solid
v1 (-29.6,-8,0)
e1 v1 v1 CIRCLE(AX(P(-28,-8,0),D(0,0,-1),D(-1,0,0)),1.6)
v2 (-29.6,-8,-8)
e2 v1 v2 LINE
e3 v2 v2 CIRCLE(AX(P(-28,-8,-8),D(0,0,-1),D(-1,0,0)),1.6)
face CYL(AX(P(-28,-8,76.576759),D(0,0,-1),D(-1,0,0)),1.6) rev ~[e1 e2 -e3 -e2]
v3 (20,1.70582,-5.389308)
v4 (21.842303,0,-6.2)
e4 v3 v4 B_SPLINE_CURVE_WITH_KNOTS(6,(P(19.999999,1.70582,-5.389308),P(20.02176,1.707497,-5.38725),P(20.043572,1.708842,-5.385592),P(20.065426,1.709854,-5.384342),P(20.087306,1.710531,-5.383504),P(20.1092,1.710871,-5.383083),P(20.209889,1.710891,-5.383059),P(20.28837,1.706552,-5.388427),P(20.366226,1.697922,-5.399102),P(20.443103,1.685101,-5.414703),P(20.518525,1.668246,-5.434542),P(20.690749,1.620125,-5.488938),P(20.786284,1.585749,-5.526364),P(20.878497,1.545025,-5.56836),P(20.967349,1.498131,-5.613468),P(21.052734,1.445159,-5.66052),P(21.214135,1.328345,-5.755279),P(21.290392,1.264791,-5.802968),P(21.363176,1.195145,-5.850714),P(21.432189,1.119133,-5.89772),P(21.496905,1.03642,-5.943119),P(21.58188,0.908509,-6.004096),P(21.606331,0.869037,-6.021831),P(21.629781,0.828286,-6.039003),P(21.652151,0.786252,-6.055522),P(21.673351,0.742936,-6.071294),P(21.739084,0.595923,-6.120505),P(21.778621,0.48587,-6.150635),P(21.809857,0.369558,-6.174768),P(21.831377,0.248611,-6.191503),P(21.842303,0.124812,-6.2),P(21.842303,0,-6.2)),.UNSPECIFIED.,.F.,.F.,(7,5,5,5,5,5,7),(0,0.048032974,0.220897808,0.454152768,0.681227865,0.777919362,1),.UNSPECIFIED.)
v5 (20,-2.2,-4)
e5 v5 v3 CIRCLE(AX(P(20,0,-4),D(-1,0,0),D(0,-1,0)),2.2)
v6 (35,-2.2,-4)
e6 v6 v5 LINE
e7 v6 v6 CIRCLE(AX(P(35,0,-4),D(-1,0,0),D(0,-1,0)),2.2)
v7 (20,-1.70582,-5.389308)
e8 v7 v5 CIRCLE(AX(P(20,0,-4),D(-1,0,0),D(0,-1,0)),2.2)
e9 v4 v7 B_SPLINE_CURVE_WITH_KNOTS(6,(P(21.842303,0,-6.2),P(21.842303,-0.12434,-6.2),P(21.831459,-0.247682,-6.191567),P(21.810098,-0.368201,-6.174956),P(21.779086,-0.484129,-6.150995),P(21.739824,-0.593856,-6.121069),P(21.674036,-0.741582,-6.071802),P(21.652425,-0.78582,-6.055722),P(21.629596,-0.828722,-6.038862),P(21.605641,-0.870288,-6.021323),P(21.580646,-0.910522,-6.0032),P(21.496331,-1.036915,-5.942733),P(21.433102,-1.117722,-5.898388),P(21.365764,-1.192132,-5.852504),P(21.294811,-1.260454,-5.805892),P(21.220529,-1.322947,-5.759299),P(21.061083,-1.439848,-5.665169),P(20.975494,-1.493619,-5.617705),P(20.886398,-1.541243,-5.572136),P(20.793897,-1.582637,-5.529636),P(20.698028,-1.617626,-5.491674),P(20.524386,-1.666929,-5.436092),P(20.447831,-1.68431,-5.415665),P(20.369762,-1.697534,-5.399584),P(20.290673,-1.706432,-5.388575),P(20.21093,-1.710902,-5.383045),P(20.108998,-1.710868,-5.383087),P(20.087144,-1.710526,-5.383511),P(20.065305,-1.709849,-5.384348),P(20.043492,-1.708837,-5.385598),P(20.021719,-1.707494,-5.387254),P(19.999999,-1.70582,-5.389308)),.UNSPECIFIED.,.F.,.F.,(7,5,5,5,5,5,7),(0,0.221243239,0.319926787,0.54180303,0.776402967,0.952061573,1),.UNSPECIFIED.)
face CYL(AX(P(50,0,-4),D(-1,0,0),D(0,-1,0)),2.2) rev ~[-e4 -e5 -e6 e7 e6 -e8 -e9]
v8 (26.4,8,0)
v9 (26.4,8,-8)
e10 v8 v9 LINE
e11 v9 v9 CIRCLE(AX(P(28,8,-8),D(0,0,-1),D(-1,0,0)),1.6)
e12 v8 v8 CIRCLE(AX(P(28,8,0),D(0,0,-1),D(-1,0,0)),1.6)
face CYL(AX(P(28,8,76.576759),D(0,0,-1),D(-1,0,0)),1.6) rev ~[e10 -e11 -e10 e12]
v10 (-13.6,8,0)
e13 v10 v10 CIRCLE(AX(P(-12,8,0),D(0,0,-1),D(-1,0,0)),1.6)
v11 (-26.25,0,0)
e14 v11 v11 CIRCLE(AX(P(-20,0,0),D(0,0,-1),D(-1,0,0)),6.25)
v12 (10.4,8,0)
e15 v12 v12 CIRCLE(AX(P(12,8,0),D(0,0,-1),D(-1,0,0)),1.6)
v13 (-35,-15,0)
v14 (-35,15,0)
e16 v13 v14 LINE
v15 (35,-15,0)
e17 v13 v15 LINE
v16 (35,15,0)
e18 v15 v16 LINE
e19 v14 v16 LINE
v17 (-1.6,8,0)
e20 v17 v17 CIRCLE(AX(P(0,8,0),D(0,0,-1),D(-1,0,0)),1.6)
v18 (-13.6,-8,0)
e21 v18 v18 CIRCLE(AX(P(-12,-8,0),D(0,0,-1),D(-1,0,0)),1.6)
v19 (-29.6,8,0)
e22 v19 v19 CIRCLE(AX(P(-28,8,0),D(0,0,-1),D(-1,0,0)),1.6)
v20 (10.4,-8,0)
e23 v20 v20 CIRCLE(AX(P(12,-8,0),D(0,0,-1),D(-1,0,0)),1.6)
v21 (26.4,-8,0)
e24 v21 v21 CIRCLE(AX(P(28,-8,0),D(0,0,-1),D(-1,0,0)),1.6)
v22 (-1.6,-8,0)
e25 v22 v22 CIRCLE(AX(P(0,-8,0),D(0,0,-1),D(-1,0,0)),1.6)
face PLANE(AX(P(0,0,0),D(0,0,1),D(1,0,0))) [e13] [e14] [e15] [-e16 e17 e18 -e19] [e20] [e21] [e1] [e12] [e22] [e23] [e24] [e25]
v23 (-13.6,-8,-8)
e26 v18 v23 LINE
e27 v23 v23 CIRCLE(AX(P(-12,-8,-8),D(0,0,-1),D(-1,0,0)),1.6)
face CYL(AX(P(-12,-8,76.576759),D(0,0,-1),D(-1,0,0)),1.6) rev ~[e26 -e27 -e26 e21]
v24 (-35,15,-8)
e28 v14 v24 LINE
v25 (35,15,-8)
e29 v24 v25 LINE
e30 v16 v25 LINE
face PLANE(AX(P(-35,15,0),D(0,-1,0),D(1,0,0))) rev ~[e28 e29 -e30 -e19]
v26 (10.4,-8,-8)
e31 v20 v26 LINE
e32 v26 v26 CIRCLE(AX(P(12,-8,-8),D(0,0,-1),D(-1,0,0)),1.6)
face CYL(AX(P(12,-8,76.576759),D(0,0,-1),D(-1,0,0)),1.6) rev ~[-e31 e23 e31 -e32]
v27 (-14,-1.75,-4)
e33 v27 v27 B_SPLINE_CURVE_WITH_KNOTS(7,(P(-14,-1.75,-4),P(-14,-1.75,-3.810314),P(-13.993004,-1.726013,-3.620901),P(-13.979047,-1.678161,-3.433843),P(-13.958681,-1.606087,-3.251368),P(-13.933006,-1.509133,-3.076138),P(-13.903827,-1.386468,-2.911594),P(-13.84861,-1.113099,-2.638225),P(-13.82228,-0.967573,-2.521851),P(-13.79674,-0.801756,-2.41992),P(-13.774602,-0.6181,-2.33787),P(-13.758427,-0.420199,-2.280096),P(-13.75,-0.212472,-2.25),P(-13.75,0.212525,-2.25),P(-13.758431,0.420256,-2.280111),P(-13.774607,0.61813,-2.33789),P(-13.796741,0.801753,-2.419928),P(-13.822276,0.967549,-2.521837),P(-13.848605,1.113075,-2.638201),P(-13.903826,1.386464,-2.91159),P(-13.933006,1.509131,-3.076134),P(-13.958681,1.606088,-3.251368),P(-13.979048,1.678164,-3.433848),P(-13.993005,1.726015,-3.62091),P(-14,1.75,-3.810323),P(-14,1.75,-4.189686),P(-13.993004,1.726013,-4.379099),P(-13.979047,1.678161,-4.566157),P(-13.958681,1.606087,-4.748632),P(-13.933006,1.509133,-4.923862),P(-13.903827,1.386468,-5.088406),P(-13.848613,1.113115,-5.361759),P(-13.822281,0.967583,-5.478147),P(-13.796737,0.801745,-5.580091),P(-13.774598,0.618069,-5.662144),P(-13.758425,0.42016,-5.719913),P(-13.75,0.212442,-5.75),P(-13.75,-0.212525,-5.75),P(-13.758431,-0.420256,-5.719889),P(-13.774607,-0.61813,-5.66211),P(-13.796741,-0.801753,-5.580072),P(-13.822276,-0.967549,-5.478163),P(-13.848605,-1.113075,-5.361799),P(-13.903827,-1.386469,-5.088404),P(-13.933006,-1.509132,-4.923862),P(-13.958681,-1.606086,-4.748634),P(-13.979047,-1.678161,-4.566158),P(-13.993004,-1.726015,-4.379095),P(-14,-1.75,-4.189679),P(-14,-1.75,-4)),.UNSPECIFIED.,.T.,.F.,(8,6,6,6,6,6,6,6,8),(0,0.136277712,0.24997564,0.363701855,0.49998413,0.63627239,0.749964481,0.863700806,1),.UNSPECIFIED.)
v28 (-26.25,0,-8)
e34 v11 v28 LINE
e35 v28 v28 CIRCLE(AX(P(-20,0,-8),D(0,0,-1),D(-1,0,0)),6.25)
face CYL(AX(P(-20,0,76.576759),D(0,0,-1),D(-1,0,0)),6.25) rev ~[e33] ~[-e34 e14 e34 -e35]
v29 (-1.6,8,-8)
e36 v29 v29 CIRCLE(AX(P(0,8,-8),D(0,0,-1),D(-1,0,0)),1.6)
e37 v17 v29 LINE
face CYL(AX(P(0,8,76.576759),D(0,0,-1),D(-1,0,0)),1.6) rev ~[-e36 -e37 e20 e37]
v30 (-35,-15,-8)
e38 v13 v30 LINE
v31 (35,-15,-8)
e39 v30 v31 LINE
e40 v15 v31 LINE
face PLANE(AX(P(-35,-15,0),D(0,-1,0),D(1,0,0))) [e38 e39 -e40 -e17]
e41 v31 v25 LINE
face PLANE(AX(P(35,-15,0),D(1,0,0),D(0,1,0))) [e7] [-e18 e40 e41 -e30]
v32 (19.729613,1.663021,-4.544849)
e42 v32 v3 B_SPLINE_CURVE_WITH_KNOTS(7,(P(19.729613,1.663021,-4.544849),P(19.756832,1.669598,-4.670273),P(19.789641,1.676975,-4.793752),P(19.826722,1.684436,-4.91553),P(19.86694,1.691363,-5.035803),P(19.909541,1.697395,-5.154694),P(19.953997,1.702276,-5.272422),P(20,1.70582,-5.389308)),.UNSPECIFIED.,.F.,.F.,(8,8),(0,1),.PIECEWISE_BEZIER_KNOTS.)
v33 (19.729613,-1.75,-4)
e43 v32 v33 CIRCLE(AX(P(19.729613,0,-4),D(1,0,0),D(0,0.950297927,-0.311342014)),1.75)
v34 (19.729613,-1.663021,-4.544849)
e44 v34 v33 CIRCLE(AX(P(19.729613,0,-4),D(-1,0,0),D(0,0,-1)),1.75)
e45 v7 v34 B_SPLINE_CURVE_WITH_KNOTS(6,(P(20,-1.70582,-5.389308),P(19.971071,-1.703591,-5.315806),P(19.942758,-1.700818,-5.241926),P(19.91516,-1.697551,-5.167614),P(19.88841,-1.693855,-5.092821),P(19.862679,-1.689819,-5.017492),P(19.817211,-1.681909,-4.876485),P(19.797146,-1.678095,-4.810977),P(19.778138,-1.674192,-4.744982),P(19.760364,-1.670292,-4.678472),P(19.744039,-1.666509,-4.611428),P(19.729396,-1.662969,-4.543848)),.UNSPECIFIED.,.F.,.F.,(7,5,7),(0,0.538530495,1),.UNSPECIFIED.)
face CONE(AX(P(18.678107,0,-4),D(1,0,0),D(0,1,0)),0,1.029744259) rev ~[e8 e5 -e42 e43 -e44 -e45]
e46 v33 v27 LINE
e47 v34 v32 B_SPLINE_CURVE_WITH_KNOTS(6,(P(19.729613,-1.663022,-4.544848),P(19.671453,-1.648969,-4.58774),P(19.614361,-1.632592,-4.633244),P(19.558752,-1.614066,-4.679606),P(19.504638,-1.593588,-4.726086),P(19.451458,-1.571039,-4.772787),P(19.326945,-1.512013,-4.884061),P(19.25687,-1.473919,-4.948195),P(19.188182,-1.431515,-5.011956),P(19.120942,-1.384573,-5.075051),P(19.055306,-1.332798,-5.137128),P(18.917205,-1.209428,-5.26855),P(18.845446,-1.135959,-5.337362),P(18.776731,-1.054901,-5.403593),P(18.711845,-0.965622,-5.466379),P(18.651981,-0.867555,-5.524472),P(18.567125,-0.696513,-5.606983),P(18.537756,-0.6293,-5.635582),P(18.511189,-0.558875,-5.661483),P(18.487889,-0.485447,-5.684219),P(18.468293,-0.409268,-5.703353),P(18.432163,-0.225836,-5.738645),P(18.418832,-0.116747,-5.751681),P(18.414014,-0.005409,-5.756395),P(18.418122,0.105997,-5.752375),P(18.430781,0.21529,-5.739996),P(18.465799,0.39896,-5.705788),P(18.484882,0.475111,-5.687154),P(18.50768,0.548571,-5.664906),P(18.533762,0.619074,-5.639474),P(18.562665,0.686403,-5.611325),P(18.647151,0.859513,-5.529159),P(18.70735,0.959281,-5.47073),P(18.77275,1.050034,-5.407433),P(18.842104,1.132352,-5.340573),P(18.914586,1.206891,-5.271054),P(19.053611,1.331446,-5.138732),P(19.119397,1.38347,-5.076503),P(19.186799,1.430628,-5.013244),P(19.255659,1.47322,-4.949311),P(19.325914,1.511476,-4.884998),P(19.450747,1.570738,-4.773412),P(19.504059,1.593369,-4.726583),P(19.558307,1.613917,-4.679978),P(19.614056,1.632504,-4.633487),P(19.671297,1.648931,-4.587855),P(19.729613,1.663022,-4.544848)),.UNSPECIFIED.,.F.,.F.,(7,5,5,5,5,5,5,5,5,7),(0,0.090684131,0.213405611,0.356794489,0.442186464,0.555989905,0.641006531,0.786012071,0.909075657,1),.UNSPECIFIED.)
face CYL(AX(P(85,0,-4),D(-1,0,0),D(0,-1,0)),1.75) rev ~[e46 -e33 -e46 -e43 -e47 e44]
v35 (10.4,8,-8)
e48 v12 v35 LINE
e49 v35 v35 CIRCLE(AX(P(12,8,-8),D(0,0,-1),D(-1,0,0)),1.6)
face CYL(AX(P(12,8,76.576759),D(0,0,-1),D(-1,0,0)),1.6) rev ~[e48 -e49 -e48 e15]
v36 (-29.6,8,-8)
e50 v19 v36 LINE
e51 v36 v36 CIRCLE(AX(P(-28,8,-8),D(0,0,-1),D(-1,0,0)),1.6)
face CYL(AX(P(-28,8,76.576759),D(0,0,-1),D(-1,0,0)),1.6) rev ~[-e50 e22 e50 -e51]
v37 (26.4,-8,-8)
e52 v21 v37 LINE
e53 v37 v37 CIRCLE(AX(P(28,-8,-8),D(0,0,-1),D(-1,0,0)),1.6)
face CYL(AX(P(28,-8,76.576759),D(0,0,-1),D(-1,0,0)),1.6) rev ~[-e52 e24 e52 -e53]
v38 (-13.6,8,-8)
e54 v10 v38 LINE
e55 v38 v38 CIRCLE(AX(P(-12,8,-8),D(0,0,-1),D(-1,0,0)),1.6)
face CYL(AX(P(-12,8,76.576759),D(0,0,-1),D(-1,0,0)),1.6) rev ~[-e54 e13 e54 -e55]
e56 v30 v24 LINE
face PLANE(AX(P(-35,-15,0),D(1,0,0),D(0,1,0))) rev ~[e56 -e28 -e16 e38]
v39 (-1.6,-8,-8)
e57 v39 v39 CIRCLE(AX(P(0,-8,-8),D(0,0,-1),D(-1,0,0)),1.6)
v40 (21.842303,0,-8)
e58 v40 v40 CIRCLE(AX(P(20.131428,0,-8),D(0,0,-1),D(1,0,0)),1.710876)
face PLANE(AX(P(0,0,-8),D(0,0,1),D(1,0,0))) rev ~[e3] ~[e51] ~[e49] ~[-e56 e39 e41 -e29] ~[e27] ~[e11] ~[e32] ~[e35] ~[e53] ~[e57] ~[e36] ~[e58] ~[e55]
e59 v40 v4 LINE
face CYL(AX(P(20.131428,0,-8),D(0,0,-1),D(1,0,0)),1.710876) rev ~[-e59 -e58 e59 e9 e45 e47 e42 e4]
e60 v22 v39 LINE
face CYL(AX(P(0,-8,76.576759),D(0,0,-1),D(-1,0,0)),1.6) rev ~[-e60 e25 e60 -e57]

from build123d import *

# Parameters (mm, degrees)
F0_W     = 70
F0_H     = 30
F1_DEPTH = 8
F2_D     = 3.2
F3_D     = 12.5
F5_D     = 3.5
F5_DEPTH = 50
F5_TIP   = 1.0515060833
F6_D     = 4.4
F6_DEPTH = 15
F6_TIP   = 1.3218933619
F7_R     = 1.7108756352
F8_DEPTH = 3.456151576


with BuildPart() as f1:
    # F0 (on Top) → F1 (new body)
    with BuildSketch(Plane.XY):
        Rectangle(F0_W, F0_H)
    extrude(amount=-F1_DEPTH)

    # F2 (through all)
    with Locations(Plane.XY):
        with Locations((-28, 8), (-12, 8), (-28, -8), (-12, -8), (0, 8), (0, -8), (12, 8), (12, -8), (28, 8), (28, -8)):
            Hole(F2_D / 2)

    # F3 (through all)
    with Locations(Plane.XY):
        with Locations((-20, 0)):
            Hole(F3_D / 2)

    # F5
    with Locations(Plane.YZ.offset(35)):
        with Locations((0, -4)):
            Hole(F5_D / 2, depth=F5_DEPTH)
            with Locations((0, 0, -(F5_DEPTH + F5_TIP / 2))):  # 118° drill point
                Cone(0, F5_D / 2, F5_TIP, mode=Mode.SUBTRACT)

    # F6
    with Locations(Plane.YZ.offset(35)):
        with Locations((0, -4)):
            Hole(F6_D / 2, depth=F6_DEPTH)
            with Locations((0, 0, -(F6_DEPTH + F6_TIP / 2))):  # 118° drill point
                Cone(0, F6_D / 2, F6_TIP, mode=Mode.SUBTRACT)

    # F7 (on face) → F8 (cut, through all)
    with BuildSketch(Plane(origin=(0, 0, -8), x_dir=(1, 0, 0), z_dir=(0, 0, -1))):
        with Locations((20.1314277947, 0)):
            Circle(F7_R)
    extrude(amount=-F8_DEPTH, mode=Mode.SUBTRACT)


solid = f1.part
